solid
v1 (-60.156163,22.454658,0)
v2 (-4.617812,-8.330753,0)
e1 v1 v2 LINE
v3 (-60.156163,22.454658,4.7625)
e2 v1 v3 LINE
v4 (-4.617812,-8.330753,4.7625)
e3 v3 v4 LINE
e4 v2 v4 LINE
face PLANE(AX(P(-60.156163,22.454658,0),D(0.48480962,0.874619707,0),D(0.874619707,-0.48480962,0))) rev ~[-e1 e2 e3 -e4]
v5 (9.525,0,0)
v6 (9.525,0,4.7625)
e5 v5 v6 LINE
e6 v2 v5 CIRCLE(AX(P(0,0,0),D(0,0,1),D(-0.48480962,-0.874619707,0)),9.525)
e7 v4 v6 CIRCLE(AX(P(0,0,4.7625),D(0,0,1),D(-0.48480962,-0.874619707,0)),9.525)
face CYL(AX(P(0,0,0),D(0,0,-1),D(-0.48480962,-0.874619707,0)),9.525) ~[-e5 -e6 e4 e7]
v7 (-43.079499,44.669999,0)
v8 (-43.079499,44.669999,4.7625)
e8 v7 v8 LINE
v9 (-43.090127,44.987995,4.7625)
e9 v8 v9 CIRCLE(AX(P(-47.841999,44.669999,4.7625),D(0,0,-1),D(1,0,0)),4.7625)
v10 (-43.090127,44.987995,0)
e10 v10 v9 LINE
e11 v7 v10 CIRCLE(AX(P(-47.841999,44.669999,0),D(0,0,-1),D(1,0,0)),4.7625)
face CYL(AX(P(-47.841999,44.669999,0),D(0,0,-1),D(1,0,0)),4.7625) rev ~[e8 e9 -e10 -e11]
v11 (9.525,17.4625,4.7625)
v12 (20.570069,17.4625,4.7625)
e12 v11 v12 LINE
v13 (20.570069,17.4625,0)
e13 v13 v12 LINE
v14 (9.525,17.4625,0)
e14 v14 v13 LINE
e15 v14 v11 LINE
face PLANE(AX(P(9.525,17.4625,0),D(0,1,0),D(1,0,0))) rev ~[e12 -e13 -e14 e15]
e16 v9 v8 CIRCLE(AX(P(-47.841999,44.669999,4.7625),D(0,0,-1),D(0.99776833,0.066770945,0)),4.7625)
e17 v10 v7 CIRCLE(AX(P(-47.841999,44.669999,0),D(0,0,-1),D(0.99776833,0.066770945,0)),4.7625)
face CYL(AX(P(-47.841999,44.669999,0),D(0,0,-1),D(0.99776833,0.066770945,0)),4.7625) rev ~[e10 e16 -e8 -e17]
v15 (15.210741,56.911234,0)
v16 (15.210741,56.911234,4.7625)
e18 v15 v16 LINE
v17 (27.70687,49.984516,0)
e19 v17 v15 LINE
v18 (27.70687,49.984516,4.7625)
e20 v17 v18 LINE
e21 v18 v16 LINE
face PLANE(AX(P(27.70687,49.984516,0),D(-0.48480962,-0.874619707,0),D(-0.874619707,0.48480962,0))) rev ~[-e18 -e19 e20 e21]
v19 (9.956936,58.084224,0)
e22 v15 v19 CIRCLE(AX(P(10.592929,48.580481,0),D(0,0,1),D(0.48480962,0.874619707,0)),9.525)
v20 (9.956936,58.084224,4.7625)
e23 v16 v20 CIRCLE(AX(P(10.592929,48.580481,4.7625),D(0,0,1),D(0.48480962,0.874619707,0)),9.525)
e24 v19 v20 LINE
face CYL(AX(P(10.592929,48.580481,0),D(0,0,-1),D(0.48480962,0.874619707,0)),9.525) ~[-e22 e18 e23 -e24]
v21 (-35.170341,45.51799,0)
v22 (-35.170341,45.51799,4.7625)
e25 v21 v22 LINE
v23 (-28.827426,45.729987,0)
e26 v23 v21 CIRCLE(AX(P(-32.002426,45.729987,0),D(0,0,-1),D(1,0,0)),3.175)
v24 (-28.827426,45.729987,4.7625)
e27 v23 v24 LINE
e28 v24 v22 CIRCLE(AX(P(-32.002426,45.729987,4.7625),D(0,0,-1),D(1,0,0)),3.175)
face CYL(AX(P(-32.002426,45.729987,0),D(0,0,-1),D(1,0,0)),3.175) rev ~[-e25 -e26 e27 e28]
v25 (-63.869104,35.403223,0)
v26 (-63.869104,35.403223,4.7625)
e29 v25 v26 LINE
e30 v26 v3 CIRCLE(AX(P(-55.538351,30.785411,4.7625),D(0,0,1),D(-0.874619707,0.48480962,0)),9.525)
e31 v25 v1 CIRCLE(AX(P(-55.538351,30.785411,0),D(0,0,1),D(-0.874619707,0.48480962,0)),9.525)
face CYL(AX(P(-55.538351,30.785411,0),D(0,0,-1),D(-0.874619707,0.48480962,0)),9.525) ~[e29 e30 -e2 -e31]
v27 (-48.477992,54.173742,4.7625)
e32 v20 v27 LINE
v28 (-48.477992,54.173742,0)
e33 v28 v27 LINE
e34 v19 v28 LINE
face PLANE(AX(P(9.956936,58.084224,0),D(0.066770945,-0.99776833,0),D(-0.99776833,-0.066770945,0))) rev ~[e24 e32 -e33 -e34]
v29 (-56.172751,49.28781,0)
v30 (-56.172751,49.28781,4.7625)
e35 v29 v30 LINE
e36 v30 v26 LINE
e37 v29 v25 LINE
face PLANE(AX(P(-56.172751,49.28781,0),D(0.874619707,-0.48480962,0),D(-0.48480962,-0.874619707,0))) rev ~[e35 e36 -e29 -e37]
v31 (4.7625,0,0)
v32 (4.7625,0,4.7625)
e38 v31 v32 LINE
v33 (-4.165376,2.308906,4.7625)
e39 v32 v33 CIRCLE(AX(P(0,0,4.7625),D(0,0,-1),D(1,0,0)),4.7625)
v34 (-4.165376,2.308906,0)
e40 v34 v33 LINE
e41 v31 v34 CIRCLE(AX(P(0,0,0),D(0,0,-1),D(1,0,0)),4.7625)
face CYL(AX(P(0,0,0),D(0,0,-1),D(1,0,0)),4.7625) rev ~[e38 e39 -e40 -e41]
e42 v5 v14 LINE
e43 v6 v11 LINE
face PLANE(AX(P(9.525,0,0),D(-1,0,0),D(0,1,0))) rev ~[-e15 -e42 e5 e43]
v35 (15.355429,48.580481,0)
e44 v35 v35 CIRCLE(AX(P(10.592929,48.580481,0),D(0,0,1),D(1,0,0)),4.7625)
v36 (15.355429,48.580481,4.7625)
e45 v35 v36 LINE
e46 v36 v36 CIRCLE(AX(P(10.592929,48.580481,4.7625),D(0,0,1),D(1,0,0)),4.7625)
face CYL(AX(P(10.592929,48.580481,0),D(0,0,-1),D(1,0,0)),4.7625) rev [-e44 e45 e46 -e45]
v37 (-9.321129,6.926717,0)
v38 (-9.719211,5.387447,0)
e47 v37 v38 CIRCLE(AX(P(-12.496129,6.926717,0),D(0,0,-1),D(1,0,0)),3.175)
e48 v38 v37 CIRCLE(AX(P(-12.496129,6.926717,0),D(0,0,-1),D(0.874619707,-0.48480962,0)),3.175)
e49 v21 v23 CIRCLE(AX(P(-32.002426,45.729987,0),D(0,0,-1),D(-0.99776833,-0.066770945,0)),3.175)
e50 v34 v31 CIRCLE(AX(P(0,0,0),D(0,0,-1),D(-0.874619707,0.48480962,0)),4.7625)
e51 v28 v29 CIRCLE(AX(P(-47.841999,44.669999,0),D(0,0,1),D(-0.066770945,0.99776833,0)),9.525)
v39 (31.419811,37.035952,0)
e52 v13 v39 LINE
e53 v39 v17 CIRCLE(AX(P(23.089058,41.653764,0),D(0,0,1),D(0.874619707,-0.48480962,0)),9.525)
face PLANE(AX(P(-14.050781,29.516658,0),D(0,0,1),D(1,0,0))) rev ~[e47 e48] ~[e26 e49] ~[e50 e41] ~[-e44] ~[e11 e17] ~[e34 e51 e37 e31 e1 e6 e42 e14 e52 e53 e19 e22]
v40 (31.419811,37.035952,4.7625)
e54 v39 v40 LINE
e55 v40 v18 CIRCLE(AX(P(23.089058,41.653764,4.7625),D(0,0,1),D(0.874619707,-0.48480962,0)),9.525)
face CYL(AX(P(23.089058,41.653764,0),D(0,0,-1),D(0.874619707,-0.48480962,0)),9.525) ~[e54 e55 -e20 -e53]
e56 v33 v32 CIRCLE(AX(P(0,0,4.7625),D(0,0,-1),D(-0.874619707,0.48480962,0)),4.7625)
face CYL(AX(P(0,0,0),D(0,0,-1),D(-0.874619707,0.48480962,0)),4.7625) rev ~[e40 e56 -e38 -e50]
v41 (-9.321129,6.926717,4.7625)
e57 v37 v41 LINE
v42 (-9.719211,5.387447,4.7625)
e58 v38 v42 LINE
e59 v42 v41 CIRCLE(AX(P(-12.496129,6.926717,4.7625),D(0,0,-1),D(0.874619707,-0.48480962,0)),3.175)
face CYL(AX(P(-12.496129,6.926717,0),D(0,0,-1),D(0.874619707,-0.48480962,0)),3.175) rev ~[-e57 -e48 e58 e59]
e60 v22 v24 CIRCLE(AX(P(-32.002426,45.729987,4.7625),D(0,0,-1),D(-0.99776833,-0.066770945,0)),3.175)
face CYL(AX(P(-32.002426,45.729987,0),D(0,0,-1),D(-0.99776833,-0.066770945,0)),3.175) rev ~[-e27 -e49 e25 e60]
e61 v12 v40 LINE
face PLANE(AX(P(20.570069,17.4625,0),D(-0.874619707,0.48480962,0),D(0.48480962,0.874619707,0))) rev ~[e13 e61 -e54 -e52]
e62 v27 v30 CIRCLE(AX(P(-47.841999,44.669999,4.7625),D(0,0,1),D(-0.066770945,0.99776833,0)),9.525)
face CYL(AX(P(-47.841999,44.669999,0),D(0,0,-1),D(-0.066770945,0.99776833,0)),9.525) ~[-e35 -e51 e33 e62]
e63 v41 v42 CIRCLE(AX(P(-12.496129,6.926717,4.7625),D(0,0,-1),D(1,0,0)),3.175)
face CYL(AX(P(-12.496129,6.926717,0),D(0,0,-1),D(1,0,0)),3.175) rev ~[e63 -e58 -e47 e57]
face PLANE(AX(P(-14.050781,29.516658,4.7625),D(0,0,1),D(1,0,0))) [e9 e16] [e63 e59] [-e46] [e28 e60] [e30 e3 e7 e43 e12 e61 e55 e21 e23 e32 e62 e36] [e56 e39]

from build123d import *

# Parameters (mm, degrees)
F0_R     = 4.7625
F1_DEPTH = 4.7625


# Not quite as in the source:
# - a length typed as a fraction of an inch, garbled in the dataset ("3 / 203.2 mm" for 3/8 in), is restored


with BuildPart() as f1:
    # F0 (on Top) → F1 (new body)
    with BuildSketch(Plane.XY):
        with BuildLine():
            Line((-60.1561630362, 22.4546581751), (-4.6178116328, -8.3307527105))
            ThreePointArc((-4.6178116328, -8.3307527105), (4.8343029072, -8.2070177532), (9.525, 0))
            Line((9.525, 0), (9.525, 17.4625))
            Line((9.525, 17.4625), (20.5700693075, 17.4625))
            Line((20.5700693075, 17.4625), (31.4198108747, 37.0359519197))
            ThreePointArc((31.4198108747, 37.0359519197), (32.245075818, 44.2792093667), (27.7068697971, 49.984516263))
            Line((27.7068697971, 49.984516263), (15.2107407313, 56.9112337123))
            ThreePointArc((15.2107407313, 56.9112337123), (12.6684281132, 57.8766054007), (9.9569358455, 58.0842243475))
            Line((9.9569358455, 58.0842243475), (-48.4779919349, 54.1737420822))
            ThreePointArc((-48.4779919349, 54.1737420822), (-52.9477518555, 52.7109507654), (-56.1727513924, 49.2878103693))
            Line((-56.1727513924, 49.2878103693), (-63.8691041139, 35.4032225185))
            ThreePointArc((-63.8691041139, 35.4032225185), (-64.6943690572, 28.1599650715), (-60.1561630362, 22.4546581751))
        make_face()
        with BuildLine():
            ThreePointArc((-9.3211290658, 6.9267174493), (-9.4222603076, 6.1317609364), (-9.7192114956, 5.387446905))
            ThreePointArc((-9.7192114956, 5.387446905), (-15.569997824, 7.7216739621), (-9.3211290658, 6.9267174493))
        make_face(mode=Mode.SUBTRACT)
        with BuildLine():
            ThreePointArc((4.7625, 0), (-1.1924347693, -4.6108031373), (-4.1653763553, 2.3089058164))
            ThreePointArc((-4.1653763553, 2.3089058164), (1.1924347693, 4.6108031373), (4.7625, 0))
        make_face(mode=Mode.SUBTRACT)
        with BuildLine():
            ThreePointArc((-43.0794986819, 44.6699987365), (-52.6018408585, 44.510911641), (-43.0901270091, 44.987995363))
            ThreePointArc((-43.0901270091, 44.987995363), (-43.0821565054, 44.829085832), (-43.0794986819, 44.6699987365))
        make_face(mode=Mode.SUBTRACT)
        with BuildLine():
            ThreePointArc((-28.827426439, 45.7299874915), (-31.8963683753, 42.5567593737), (-35.1703408876, 45.5179897405))
            ThreePointArc((-35.1703408876, 45.5179897405), (-32.1084845027, 48.9032156092), (-28.827426439, 45.7299874915))
        make_face(mode=Mode.SUBTRACT)
        with Locations((10.5929290985, 48.5804810018)):
            Circle(F0_R, mode=Mode.SUBTRACT)
    extrude(amount=F1_DEPTH)


solid = f1.part
